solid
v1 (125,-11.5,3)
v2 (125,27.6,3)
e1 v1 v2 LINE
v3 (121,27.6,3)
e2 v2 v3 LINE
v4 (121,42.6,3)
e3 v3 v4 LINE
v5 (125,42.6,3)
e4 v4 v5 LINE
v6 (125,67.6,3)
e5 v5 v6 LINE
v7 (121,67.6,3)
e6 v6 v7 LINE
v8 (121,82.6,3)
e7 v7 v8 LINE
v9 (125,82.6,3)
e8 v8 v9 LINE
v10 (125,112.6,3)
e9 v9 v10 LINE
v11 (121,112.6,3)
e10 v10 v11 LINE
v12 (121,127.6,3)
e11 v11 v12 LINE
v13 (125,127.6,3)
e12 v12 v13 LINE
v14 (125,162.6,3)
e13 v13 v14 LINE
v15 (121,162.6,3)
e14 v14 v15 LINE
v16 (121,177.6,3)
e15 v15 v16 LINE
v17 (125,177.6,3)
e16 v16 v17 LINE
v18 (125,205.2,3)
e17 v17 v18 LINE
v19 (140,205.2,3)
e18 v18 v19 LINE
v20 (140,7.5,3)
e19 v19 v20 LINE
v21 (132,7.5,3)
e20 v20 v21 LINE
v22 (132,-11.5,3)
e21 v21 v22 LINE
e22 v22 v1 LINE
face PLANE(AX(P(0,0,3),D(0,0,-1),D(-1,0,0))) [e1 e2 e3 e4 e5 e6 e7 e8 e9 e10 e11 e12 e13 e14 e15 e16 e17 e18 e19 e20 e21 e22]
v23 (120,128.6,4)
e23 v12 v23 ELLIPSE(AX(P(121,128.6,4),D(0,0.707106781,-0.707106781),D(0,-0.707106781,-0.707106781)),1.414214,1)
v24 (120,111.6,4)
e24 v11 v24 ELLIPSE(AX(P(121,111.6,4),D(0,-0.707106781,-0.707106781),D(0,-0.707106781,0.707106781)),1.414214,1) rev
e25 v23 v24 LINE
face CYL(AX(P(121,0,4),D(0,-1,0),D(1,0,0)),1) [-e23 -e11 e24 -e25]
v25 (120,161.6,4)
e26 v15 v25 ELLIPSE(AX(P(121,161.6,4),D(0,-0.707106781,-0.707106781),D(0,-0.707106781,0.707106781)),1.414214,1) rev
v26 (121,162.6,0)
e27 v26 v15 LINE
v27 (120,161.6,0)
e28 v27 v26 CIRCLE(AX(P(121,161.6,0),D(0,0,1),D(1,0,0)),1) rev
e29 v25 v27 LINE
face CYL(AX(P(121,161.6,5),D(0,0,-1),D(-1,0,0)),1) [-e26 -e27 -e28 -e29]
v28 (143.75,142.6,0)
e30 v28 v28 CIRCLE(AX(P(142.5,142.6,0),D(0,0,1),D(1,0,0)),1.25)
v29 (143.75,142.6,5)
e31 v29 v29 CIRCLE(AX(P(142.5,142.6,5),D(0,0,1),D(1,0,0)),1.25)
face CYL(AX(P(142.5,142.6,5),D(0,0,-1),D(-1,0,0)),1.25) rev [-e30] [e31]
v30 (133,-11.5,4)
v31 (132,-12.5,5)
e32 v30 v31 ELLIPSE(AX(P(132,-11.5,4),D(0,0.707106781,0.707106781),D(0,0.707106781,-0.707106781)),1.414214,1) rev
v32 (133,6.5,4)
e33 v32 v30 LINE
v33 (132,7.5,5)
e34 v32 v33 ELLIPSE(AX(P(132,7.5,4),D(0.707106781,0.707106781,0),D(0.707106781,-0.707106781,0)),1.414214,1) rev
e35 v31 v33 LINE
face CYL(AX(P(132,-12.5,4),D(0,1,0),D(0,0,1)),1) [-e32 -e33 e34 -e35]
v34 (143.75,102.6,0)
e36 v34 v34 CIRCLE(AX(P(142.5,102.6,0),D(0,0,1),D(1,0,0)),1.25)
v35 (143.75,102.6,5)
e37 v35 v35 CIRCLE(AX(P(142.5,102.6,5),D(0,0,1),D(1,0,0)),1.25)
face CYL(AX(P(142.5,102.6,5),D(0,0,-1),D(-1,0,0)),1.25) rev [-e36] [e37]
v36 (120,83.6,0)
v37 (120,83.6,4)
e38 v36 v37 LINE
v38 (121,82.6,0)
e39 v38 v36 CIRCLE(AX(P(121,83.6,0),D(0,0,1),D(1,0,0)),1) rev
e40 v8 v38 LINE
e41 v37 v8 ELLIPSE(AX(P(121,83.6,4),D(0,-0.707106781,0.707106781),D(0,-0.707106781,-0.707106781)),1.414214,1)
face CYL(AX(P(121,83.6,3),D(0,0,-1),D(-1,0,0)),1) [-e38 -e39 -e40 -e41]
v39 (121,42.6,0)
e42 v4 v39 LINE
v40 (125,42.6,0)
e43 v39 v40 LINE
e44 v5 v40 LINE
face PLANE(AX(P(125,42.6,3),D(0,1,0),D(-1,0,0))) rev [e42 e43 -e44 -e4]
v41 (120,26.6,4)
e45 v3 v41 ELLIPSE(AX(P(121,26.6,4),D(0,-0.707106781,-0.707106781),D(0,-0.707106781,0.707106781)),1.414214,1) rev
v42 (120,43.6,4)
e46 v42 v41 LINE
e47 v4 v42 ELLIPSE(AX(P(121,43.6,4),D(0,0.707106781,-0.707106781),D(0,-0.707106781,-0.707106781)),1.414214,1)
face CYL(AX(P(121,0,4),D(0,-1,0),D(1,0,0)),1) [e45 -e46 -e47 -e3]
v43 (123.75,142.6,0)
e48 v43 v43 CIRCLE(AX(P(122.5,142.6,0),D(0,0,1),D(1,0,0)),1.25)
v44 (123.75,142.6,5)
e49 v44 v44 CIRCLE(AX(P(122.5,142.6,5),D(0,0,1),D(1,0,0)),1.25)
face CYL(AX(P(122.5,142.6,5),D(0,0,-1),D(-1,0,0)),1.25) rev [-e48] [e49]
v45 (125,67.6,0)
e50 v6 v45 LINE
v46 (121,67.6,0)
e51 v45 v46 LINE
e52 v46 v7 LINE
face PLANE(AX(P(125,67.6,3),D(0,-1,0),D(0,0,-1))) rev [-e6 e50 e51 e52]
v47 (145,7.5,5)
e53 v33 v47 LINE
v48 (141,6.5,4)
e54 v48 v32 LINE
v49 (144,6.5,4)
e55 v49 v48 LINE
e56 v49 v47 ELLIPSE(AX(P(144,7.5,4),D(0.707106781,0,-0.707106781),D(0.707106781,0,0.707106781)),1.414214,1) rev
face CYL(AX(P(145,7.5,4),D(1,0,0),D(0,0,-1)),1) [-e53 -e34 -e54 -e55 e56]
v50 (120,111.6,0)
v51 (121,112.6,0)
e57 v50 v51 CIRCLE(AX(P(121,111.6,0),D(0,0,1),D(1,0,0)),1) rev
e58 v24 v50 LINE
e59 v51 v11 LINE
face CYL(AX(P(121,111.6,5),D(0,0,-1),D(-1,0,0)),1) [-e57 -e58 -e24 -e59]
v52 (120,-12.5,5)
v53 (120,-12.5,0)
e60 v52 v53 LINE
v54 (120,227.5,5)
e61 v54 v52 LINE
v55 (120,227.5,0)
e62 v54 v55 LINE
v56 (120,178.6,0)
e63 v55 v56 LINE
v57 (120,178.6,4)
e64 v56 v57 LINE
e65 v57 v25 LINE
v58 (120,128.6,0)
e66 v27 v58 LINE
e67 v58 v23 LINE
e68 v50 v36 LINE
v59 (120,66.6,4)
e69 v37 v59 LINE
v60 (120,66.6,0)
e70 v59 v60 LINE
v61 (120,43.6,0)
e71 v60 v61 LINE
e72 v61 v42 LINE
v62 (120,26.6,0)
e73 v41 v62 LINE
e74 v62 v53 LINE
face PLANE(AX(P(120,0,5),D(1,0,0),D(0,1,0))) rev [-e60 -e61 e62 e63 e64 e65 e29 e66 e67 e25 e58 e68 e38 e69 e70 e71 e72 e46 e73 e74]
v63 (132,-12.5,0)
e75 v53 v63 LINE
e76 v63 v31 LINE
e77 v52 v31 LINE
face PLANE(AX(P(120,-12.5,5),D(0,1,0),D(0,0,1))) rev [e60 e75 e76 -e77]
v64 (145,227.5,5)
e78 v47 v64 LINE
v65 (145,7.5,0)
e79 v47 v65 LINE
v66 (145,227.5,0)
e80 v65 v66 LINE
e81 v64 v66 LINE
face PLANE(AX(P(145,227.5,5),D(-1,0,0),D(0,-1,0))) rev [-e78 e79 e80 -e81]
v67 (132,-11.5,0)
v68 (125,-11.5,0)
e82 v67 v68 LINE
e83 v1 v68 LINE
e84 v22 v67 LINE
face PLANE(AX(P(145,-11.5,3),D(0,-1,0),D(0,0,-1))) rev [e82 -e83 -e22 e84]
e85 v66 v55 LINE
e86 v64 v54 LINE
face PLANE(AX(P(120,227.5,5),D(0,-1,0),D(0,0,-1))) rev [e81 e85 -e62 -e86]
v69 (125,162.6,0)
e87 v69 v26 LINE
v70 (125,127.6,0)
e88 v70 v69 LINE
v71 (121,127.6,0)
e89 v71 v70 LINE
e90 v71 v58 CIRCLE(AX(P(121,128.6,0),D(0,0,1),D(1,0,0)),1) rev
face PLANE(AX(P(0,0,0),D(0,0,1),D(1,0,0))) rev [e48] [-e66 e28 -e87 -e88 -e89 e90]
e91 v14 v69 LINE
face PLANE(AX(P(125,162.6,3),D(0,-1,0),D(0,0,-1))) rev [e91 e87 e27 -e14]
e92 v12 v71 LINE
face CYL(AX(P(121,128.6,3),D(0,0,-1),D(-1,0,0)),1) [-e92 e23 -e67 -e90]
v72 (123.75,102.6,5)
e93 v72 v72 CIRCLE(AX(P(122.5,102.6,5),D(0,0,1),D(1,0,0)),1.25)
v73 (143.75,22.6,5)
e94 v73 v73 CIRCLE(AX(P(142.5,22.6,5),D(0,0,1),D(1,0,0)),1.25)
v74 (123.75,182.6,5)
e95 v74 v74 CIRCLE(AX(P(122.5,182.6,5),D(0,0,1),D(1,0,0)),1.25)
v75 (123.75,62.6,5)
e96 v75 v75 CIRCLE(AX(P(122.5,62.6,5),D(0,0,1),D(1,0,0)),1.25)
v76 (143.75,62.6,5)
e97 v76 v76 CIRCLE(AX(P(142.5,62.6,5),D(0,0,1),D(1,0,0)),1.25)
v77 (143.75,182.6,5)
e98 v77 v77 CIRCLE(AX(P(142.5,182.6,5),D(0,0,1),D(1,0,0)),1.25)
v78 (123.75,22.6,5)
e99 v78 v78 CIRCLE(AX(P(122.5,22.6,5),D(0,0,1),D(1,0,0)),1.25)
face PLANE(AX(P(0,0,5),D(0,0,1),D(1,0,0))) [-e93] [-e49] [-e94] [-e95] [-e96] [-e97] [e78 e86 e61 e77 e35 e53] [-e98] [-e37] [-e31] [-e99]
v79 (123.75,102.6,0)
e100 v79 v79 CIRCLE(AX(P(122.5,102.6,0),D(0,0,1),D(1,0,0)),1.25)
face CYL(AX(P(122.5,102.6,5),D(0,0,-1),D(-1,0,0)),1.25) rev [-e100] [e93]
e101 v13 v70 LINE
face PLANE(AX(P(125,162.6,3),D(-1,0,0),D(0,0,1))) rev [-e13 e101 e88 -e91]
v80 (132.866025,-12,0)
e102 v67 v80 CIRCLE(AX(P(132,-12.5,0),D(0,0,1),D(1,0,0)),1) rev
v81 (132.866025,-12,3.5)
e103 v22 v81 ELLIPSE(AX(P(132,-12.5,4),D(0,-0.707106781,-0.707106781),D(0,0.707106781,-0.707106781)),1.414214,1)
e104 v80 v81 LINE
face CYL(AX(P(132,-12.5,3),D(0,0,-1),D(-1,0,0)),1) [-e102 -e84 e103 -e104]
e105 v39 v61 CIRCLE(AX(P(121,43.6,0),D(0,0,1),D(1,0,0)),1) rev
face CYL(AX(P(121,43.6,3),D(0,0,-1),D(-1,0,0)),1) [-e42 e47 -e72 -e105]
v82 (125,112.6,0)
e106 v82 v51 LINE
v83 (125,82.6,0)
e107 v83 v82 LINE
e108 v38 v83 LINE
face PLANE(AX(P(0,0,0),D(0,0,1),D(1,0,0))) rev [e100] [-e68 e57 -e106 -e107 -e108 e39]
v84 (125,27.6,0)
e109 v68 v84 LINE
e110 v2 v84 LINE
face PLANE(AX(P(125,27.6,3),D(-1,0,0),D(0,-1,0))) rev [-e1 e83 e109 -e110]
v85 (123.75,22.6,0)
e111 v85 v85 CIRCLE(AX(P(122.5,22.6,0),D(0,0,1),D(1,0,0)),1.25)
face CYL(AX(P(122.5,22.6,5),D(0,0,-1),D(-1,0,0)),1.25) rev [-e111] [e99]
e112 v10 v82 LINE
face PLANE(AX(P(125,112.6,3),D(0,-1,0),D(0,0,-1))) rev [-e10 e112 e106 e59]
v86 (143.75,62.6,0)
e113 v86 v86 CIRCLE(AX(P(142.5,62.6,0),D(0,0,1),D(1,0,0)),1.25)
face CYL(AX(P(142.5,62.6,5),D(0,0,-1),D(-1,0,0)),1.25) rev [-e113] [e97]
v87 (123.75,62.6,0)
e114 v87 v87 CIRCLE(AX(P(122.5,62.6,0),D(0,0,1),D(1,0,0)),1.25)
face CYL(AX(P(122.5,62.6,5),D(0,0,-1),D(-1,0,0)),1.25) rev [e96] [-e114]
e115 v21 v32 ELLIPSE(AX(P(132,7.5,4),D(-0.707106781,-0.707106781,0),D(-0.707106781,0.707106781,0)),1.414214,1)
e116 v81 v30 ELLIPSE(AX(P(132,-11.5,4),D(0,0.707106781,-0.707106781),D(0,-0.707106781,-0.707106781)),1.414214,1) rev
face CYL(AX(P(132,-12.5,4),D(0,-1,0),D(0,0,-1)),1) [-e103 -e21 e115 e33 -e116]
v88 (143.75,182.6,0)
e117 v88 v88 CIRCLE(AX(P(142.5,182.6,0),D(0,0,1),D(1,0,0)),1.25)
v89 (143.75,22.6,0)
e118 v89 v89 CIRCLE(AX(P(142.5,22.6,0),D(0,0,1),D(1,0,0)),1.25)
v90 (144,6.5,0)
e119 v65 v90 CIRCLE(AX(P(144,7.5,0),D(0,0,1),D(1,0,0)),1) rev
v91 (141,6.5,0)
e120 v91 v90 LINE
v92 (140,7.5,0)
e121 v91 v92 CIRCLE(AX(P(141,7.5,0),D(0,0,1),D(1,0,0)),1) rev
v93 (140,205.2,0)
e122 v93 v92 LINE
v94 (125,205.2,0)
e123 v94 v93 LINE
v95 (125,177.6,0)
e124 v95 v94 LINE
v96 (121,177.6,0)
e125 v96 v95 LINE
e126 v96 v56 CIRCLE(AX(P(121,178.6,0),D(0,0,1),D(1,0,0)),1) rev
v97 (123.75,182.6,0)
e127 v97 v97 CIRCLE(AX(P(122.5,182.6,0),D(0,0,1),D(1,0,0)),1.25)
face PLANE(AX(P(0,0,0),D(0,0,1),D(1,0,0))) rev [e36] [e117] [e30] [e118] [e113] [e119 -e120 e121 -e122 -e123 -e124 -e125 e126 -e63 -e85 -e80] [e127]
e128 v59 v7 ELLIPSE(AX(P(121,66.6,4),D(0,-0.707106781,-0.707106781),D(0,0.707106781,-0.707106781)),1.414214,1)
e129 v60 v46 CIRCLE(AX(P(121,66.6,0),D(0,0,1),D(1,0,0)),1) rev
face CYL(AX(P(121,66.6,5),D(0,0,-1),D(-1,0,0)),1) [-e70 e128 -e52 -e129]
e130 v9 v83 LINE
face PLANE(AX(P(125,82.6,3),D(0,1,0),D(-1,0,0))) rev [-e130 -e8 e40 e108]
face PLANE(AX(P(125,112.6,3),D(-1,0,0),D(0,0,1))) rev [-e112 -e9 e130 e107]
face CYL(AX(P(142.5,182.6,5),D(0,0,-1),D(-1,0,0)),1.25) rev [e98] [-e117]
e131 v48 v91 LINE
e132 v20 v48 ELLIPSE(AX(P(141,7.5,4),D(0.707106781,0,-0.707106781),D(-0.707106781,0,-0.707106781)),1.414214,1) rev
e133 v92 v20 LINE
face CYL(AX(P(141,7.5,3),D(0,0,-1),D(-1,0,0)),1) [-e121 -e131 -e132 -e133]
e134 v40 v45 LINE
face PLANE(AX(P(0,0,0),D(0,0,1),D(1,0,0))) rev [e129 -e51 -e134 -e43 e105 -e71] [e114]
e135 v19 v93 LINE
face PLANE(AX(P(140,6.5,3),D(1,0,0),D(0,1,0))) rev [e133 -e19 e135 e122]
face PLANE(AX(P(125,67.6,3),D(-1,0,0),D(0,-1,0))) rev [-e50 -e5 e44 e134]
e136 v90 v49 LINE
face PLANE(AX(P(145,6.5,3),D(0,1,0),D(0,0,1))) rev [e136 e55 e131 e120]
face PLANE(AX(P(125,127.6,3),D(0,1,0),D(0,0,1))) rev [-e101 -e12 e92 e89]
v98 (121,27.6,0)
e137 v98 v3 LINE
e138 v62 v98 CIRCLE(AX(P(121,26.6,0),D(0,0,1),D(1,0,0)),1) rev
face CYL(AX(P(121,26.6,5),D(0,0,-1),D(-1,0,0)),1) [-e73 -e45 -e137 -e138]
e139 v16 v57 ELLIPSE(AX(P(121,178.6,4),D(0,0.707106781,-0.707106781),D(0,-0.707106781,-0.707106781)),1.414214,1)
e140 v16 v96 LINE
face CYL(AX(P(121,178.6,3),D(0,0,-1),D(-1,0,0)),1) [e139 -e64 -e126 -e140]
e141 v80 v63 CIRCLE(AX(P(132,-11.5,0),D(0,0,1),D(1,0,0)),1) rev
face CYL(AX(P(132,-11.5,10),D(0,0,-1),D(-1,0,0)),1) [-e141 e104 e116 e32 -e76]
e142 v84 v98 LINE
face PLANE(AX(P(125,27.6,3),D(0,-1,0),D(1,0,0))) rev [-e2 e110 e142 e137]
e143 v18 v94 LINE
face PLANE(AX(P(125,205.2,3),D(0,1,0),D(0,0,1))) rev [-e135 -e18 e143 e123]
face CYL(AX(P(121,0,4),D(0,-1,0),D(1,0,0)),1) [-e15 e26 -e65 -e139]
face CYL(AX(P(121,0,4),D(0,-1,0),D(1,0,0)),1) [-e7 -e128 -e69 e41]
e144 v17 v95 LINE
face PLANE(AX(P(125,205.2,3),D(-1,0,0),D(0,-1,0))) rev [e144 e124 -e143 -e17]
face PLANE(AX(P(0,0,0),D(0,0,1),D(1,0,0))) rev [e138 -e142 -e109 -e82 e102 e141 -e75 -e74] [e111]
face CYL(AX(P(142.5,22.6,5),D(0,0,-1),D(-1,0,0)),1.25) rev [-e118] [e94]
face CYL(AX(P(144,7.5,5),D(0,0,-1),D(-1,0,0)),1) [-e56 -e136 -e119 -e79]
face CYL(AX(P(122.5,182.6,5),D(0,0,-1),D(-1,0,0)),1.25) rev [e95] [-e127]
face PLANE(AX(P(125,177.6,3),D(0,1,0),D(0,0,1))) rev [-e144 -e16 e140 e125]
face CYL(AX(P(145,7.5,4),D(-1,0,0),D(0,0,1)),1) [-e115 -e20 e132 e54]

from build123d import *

# Parameters (mm, degrees)
SKETCH2_R           = 1.25
BOSS_EXTRUDE1_DEPTH = 5
CUT_EXTRUDE1_DEPTH  = 3
SKETCH4_W           = 12
SKETCH4_H           = 19
CUT_EXTRUDE2_DEPTH  = 10
FILLET1_R           = 1


with BuildPart() as part:
    # Sketch2 → Boss-Extrude1 (new body)
    with BuildSketch(Plane.XY):
        Polygon((120, 0), (120, -12.5), (145, -12.5), (145, 0), (145, 227.5), (120, 227.5), align=None)
        with Locations((142.5, 22.6)):
            Circle(SKETCH2_R, mode=Mode.SUBTRACT)
        with Locations((142.5, 62.6)):
            Circle(SKETCH2_R, mode=Mode.SUBTRACT)
        with Locations((142.5, 102.6)):
            Circle(SKETCH2_R, mode=Mode.SUBTRACT)
        with Locations((142.5, 142.6)):
            Circle(SKETCH2_R, mode=Mode.SUBTRACT)
        with Locations((142.5, 182.6)):
            Circle(SKETCH2_R, mode=Mode.SUBTRACT)
        with Locations((122.5, 182.6)):
            Circle(SKETCH2_R, mode=Mode.SUBTRACT)
        with Locations((122.5, 142.6)):
            Circle(SKETCH2_R, mode=Mode.SUBTRACT)
        with Locations((122.5, 62.6)):
            Circle(SKETCH2_R, mode=Mode.SUBTRACT)
        with Locations((122.5, 102.6)):
            Circle(SKETCH2_R, mode=Mode.SUBTRACT)
        with Locations((122.5, 22.6)):
            Circle(SKETCH2_R, mode=Mode.SUBTRACT)
    extrude(amount=BOSS_EXTRUDE1_DEPTH)

    # Sketch3 → Cut-Extrude1 (cut)
    with BuildSketch(Plane(origin=(0, 0, 0), x_dir=(-1, 0, 0), z_dir=(0, 0, -1))):
        Polygon((-125, 177.6), (-120, 177.6), (-120, 162.6), (-125, 162.6), (-125, 127.6), (-120, 127.6), (-120, 112.6), (-125, 112.6), (-125, 82.6), (-120, 82.6), (-120, 67.6), (-125, 67.6), (-125, 42.6), (-120, 42.6), (-120, 27.6), (-125, 27.6), (-125, 0), (-125, -11.5), (-145, -11.5), (-145, 6.5), (-140, 6.5), (-140, 205.2), (-125, 205.2), align=None)
    extrude(amount=-CUT_EXTRUDE1_DEPTH, mode=Mode.SUBTRACT)

    # Sketch4 → Cut-Extrude2 (cut)
    with BuildSketch(Plane(origin=(0, 0, 0), x_dir=(-1, 0, 0), z_dir=(0, 0, -1))):
        with Locations((-139, -3)):
            Rectangle(SKETCH4_W, SKETCH4_H)
    extrude(amount=-CUT_EXTRUDE2_DEPTH, mode=Mode.SUBTRACT)

    # Fillet1
    # the kernel refuses this fillet: 1 mm, written as the material it takes off along each edge
    with BuildSketch(Plane(origin=(133, 6.5, 3), x_dir=(0, 0, 1), z_dir=(0, -1, 0))) as fillet1_piece_1:
        with BuildLine():
            CenterArc((FILLET1_R, FILLET1_R), FILLET1_R, 180, 90)
            Line((0, FILLET1_R), (-FILLET1_R * 0.02, FILLET1_R))
            Line((-FILLET1_R * 0.02, FILLET1_R), (-FILLET1_R * 0.02, -FILLET1_R * 0.02))
            Line((-FILLET1_R * 0.02, -FILLET1_R * 0.02), (FILLET1_R, -FILLET1_R * 0.02))
            Line((FILLET1_R, -FILLET1_R * 0.02), (FILLET1_R, 0))
        make_face()
    extrude(amount=18, mode=Mode.SUBTRACT)
    with BuildSketch(Plane(origin=(133, 6.5, 5), x_dir=(0, 0, -1), z_dir=(0, -1, 0))) as fillet1_piece_2:
        with BuildLine():
            CenterArc((FILLET1_R, -FILLET1_R), FILLET1_R, 90, 90)
            Line((0, -FILLET1_R), (-FILLET1_R * 0.02, -FILLET1_R))
            Line((-FILLET1_R * 0.02, -FILLET1_R), (-FILLET1_R * 0.02, FILLET1_R * 0.02))
            Line((-FILLET1_R * 0.02, FILLET1_R * 0.02), (FILLET1_R, FILLET1_R * 0.02))
            Line((FILLET1_R, FILLET1_R * 0.02), (FILLET1_R, 0))
        make_face()
    extrude(amount=19, mode=Mode.SUBTRACT)
    with BuildSketch(Plane(origin=(133, -12.5, 0), x_dir=(0, 1, 0), z_dir=(0, 0, 1)), Plane(origin=(145, 6.5, 5), x_dir=(-1, 0, 0), z_dir=(0, 0, -1))) as fillet1_piece_3:
        with BuildLine():
            CenterArc((FILLET1_R, FILLET1_R), FILLET1_R, 180, 90)
            Line((0, FILLET1_R), (-FILLET1_R * 0.02, FILLET1_R))
            Line((-FILLET1_R * 0.02, FILLET1_R), (-FILLET1_R * 0.02, -FILLET1_R * 0.02))
            Line((-FILLET1_R * 0.02, -FILLET1_R * 0.02), (FILLET1_R, -FILLET1_R * 0.02))
            Line((FILLET1_R, -FILLET1_R * 0.02), (FILLET1_R, 0))
        make_face()
    extrude(amount=5, mode=Mode.SUBTRACT)
    with BuildSketch(Plane(origin=(133, -11.5, 0), x_dir=(0, -1, 0), z_dir=(0, 0, 1)), Plane(origin=(120, 42.6, 0), x_dir=(0, 1, 0), z_dir=(0, 0, 1)), Plane(origin=(120, 82.6, 0), x_dir=(0, 1, 0), z_dir=(0, 0, 1)), Plane(origin=(120, 127.6, 0), x_dir=(0, 1, 0), z_dir=(0, 0, 1)), Plane(origin=(120, 177.6, 0), x_dir=(0, 1, 0), z_dir=(0, 0, 1))) as fillet1_piece_4:
        with BuildLine():
            CenterArc((FILLET1_R, -FILLET1_R), FILLET1_R, 90, 90)
            Line((0, -FILLET1_R), (-FILLET1_R * 0.02, -FILLET1_R))
            Line((-FILLET1_R * 0.02, -FILLET1_R), (-FILLET1_R * 0.02, FILLET1_R * 0.02))
            Line((-FILLET1_R * 0.02, FILLET1_R * 0.02), (FILLET1_R, FILLET1_R * 0.02))
            Line((FILLET1_R, FILLET1_R * 0.02), (FILLET1_R, 0))
        make_face()
    extrude(amount=3, mode=Mode.SUBTRACT)
    with BuildSketch(Plane(origin=(140, 6.5, 0), x_dir=(1, 0, 0), z_dir=(0, 0, 1)), Plane(origin=(120, 27.6, 0), x_dir=(0, -1, 0), z_dir=(0, 0, 1)), Plane(origin=(120, 67.6, 0), x_dir=(0, -1, 0), z_dir=(0, 0, 1)), Plane(origin=(120, 112.6, 0), x_dir=(0, -1, 0), z_dir=(0, 0, 1)), Plane(origin=(120, 162.6, 0), x_dir=(0, -1, 0), z_dir=(0, 0, 1))) as fillet1_piece_5:
        with BuildLine():
            CenterArc((FILLET1_R, FILLET1_R), FILLET1_R, 180, 90)
            Line((0, FILLET1_R), (-FILLET1_R * 0.02, FILLET1_R))
            Line((-FILLET1_R * 0.02, FILLET1_R), (-FILLET1_R * 0.02, -FILLET1_R * 0.02))
            Line((-FILLET1_R * 0.02, -FILLET1_R * 0.02), (FILLET1_R, -FILLET1_R * 0.02))
            Line((FILLET1_R, -FILLET1_R * 0.02), (FILLET1_R, 0))
        make_face()
    extrude(amount=3, mode=Mode.SUBTRACT)
    with BuildSketch(Plane(origin=(140, 6.5, 3), x_dir=(0, 0, 1), z_dir=(-1, 0, 0))) as fillet1_piece_6:
        with BuildLine():
            CenterArc((FILLET1_R, FILLET1_R), FILLET1_R, 180, 90)
            Line((0, FILLET1_R), (-FILLET1_R * 0.02, FILLET1_R))
            Line((-FILLET1_R * 0.02, FILLET1_R), (-FILLET1_R * 0.02, -FILLET1_R * 0.02))
            Line((-FILLET1_R * 0.02, -FILLET1_R * 0.02), (FILLET1_R, -FILLET1_R * 0.02))
            Line((FILLET1_R, -FILLET1_R * 0.02), (FILLET1_R, 0))
        make_face()
    extrude(amount=7, mode=Mode.SUBTRACT)
    with BuildSketch(Plane(origin=(145, 6.5, 5), x_dir=(0, 0, -1), z_dir=(-1, 0, 0))) as fillet1_piece_7:
        with BuildLine():
            CenterArc((FILLET1_R, -FILLET1_R), FILLET1_R, 90, 90)
            Line((0, -FILLET1_R), (-FILLET1_R * 0.02, -FILLET1_R))
            Line((-FILLET1_R * 0.02, -FILLET1_R), (-FILLET1_R * 0.02, FILLET1_R * 0.02))
            Line((-FILLET1_R * 0.02, FILLET1_R * 0.02), (FILLET1_R, FILLET1_R * 0.02))
            Line((FILLET1_R, FILLET1_R * 0.02), (FILLET1_R, 0))
        make_face()
    extrude(amount=12, mode=Mode.SUBTRACT)
    with BuildSketch(Plane(origin=(120, 42.6, 3), x_dir=(0, 0, 1), z_dir=(0, -1, 0)), Plane(origin=(120, 82.6, 3), x_dir=(0, 0, 1), z_dir=(0, -1, 0)), Plane(origin=(120, 127.6, 3), x_dir=(0, 0, 1), z_dir=(0, -1, 0)), Plane(origin=(120, 177.6, 3), x_dir=(0, 0, 1), z_dir=(0, -1, 0))) as fillet1_piece_8:
        with BuildLine():
            CenterArc((FILLET1_R, -FILLET1_R), FILLET1_R, 90, 90)
            Line((0, -FILLET1_R), (-FILLET1_R * 0.02, -FILLET1_R))
            Line((-FILLET1_R * 0.02, -FILLET1_R), (-FILLET1_R * 0.02, FILLET1_R * 0.02))
            Line((-FILLET1_R * 0.02, FILLET1_R * 0.02), (FILLET1_R, FILLET1_R * 0.02))
            Line((FILLET1_R, FILLET1_R * 0.02), (FILLET1_R, 0))
        make_face()
    extrude(amount=15, mode=Mode.SUBTRACT)
    with BuildSketch(Plane(origin=(133, 9, 3), x_dir=(0, 0, 1), z_dir=(0, -1, 0))) as fillet1_piece_9a_section:
        with BuildLine():
            CenterArc((FILLET1_R, FILLET1_R), FILLET1_R, 180, 90)
            Line((0, FILLET1_R), (-FILLET1_R * 0.02, FILLET1_R))
            Line((-FILLET1_R * 0.02, FILLET1_R), (-FILLET1_R * 0.02, -FILLET1_R * 0.02))
            Line((-FILLET1_R * 0.02, -FILLET1_R * 0.02), (FILLET1_R, -FILLET1_R * 0.02))
            Line((FILLET1_R, -FILLET1_R * 0.02), (FILLET1_R, 0))
        make_face()
    fillet1_piece_9a = extrude(amount=20.5, mode=Mode.PRIVATE)
    fillet1_piece_9a = split(fillet1_piece_9a, bisect_by=Plane(origin=(132.773604886, 6.5, 3.226395114), z_dir=(0, 1, 0)), keep=Keep.TOP, mode=Mode.PRIVATE)
    with BuildSketch(Plane(origin=(140, 6.5, 3), x_dir=(0, 0, 1), z_dir=(-1, 0, 0))) as fillet1_piece_9b_section:
        with BuildLine():
            CenterArc((FILLET1_R, FILLET1_R), FILLET1_R, 180, 90)
            Line((0, FILLET1_R), (-FILLET1_R * 0.02, FILLET1_R))
            Line((-FILLET1_R * 0.02, FILLET1_R), (-FILLET1_R * 0.02, -FILLET1_R * 0.02))
            Line((-FILLET1_R * 0.02, -FILLET1_R * 0.02), (FILLET1_R, -FILLET1_R * 0.02))
            Line((FILLET1_R, -FILLET1_R * 0.02), (FILLET1_R, 0))
        make_face()
    fillet1_piece_9b = extrude(amount=9.5, mode=Mode.PRIVATE)
    fillet1_piece_9b = split(fillet1_piece_9b, bisect_by=Plane(origin=(133, 6.726395114, 3.226395114), z_dir=(-1, 0, 0)), keep=Keep.TOP, mode=Mode.PRIVATE)
    fillet1_piece_9 = fillet1_piece_9a & fillet1_piece_9b
    add(fillet1_piece_9, mode=Mode.SUBTRACT)
    with BuildSketch(Plane(origin=(133, -11.5, 0), x_dir=(0, -1, 0), z_dir=(0, 0, 1))) as fillet1_piece_10a_section:
        with BuildLine():
            CenterArc((FILLET1_R, -FILLET1_R), FILLET1_R, 90, 90)
            Line((0, -FILLET1_R), (-FILLET1_R * 0.02, -FILLET1_R))
            Line((-FILLET1_R * 0.02, -FILLET1_R), (-FILLET1_R * 0.02, FILLET1_R * 0.02))
            Line((-FILLET1_R * 0.02, FILLET1_R * 0.02), (FILLET1_R, FILLET1_R * 0.02))
            Line((FILLET1_R, FILLET1_R * 0.02), (FILLET1_R, 0))
        make_face()
    fillet1_piece_10a = extrude(amount=5.5, mode=Mode.PRIVATE)
    fillet1_piece_10a = split(fillet1_piece_10a, bisect_by=Plane(origin=(132.773604886, -11.726395114, 3), z_dir=(0, 0, 1)), keep=Keep.TOP, mode=Mode.PRIVATE)
    with BuildSketch(Plane(origin=(133, 6.5, 3), x_dir=(0, 0, 1), z_dir=(0, -1, 0))) as fillet1_piece_10b_section:
        with BuildLine():
            CenterArc((FILLET1_R, FILLET1_R), FILLET1_R, 180, 90)
            Line((0, FILLET1_R), (-FILLET1_R * 0.02, FILLET1_R))
            Line((-FILLET1_R * 0.02, FILLET1_R), (-FILLET1_R * 0.02, -FILLET1_R * 0.02))
            Line((-FILLET1_R * 0.02, -FILLET1_R * 0.02), (FILLET1_R, -FILLET1_R * 0.02))
            Line((FILLET1_R, -FILLET1_R * 0.02), (FILLET1_R, 0))
        make_face()
    fillet1_piece_10b = extrude(amount=20.5, mode=Mode.PRIVATE)
    fillet1_piece_10b = split(fillet1_piece_10b, bisect_by=Plane(origin=(132.773604886, -11.5, 3.226395114), z_dir=(0, -1, 0)), keep=Keep.TOP, mode=Mode.PRIVATE)
    fillet1_piece_10 = fillet1_piece_10a & fillet1_piece_10b
    add(fillet1_piece_10, mode=Mode.SUBTRACT)
    with BuildSketch(Plane(origin=(133, 9, 5), x_dir=(0, 0, -1), z_dir=(0, -1, 0))) as fillet1_piece_11a_section:
        with BuildLine():
            CenterArc((FILLET1_R, -FILLET1_R), FILLET1_R, 90, 90)
            Line((0, -FILLET1_R), (-FILLET1_R * 0.02, -FILLET1_R))
            Line((-FILLET1_R * 0.02, -FILLET1_R), (-FILLET1_R * 0.02, FILLET1_R * 0.02))
            Line((-FILLET1_R * 0.02, FILLET1_R * 0.02), (FILLET1_R, FILLET1_R * 0.02))
            Line((FILLET1_R, FILLET1_R * 0.02), (FILLET1_R, 0))
        make_face()
    fillet1_piece_11a = extrude(amount=21.5, mode=Mode.PRIVATE)
    fillet1_piece_11a = split(fillet1_piece_11a, bisect_by=Plane(origin=(132.773604886, 6.5, 4.773604886), z_dir=(0, 1, 0)), keep=Keep.TOP, mode=Mode.PRIVATE)
    with BuildSketch(Plane(origin=(145, 6.5, 5), x_dir=(0, 0, -1), z_dir=(-1, 0, 0))) as fillet1_piece_11b_section:
        with BuildLine():
            CenterArc((FILLET1_R, -FILLET1_R), FILLET1_R, 90, 90)
            Line((0, -FILLET1_R), (-FILLET1_R * 0.02, -FILLET1_R))
            Line((-FILLET1_R * 0.02, -FILLET1_R), (-FILLET1_R * 0.02, FILLET1_R * 0.02))
            Line((-FILLET1_R * 0.02, FILLET1_R * 0.02), (FILLET1_R, FILLET1_R * 0.02))
            Line((FILLET1_R, FILLET1_R * 0.02), (FILLET1_R, 0))
        make_face()
    fillet1_piece_11b = extrude(amount=14.5, mode=Mode.PRIVATE)
    fillet1_piece_11b = split(fillet1_piece_11b, bisect_by=Plane(origin=(133, 6.726395114, 4.773604886), z_dir=(-1, 0, 0)), keep=Keep.TOP, mode=Mode.PRIVATE)
    fillet1_piece_11 = fillet1_piece_11a & fillet1_piece_11b
    add(fillet1_piece_11, mode=Mode.SUBTRACT)
    with BuildSketch(Plane(origin=(133, 6.5, 5), x_dir=(0, 0, -1), z_dir=(0, -1, 0))) as fillet1_piece_12a_section:
        with BuildLine():
            CenterArc((FILLET1_R, -FILLET1_R), FILLET1_R, 90, 90)
            Line((0, -FILLET1_R), (-FILLET1_R * 0.02, -FILLET1_R))
            Line((-FILLET1_R * 0.02, -FILLET1_R), (-FILLET1_R * 0.02, FILLET1_R * 0.02))
            Line((-FILLET1_R * 0.02, FILLET1_R * 0.02), (FILLET1_R, FILLET1_R * 0.02))
            Line((FILLET1_R, FILLET1_R * 0.02), (FILLET1_R, 0))
        make_face()
    fillet1_piece_12a = extrude(amount=21.5, mode=Mode.PRIVATE)
    fillet1_piece_12a = split(fillet1_piece_12a, bisect_by=Plane(origin=(132.773604886, -12.5, 4.773604886), z_dir=(0, -1, 0)), keep=Keep.TOP, mode=Mode.PRIVATE)
    with BuildSketch(Plane(origin=(133, -12.5, 0), x_dir=(0, 1, 0), z_dir=(0, 0, 1))) as fillet1_piece_12b_section:
        with BuildLine():
            CenterArc((FILLET1_R, FILLET1_R), FILLET1_R, 180, 90)
            Line((0, FILLET1_R), (-FILLET1_R * 0.02, FILLET1_R))
            Line((-FILLET1_R * 0.02, FILLET1_R), (-FILLET1_R * 0.02, -FILLET1_R * 0.02))
            Line((-FILLET1_R * 0.02, -FILLET1_R * 0.02), (FILLET1_R, -FILLET1_R * 0.02))
            Line((FILLET1_R, -FILLET1_R * 0.02), (FILLET1_R, 0))
        make_face()
    fillet1_piece_12b = extrude(amount=7.5, mode=Mode.PRIVATE)
    fillet1_piece_12b = split(fillet1_piece_12b, bisect_by=Plane(origin=(132.773604886, -12.273604886, 5), z_dir=(0, 0, 1)), keep=Keep.TOP, mode=Mode.PRIVATE)
    fillet1_piece_12 = fillet1_piece_12a & fillet1_piece_12b
    add(fillet1_piece_12, mode=Mode.SUBTRACT)
    with BuildSketch(Plane(origin=(147.5, 6.5, 5), x_dir=(0, 0, -1), z_dir=(-1, 0, 0))) as fillet1_piece_13a_section:
        with BuildLine():
            CenterArc((FILLET1_R, -FILLET1_R), FILLET1_R, 90, 90)
            Line((0, -FILLET1_R), (-FILLET1_R * 0.02, -FILLET1_R))
            Line((-FILLET1_R * 0.02, -FILLET1_R), (-FILLET1_R * 0.02, FILLET1_R * 0.02))
            Line((-FILLET1_R * 0.02, FILLET1_R * 0.02), (FILLET1_R, FILLET1_R * 0.02))
            Line((FILLET1_R, FILLET1_R * 0.02), (FILLET1_R, 0))
        make_face()
    fillet1_piece_13a = extrude(amount=14.5, mode=Mode.PRIVATE)
    fillet1_piece_13a = split(fillet1_piece_13a, bisect_by=Plane(origin=(145, 6.726395114, 4.773604886), z_dir=(1, 0, 0)), keep=Keep.TOP, mode=Mode.PRIVATE)
    with BuildSketch(Plane(origin=(145, 6.5, 7.5), x_dir=(-1, 0, 0), z_dir=(0, 0, -1))) as fillet1_piece_13b_section:
        with BuildLine():
            CenterArc((FILLET1_R, FILLET1_R), FILLET1_R, 180, 90)
            Line((0, FILLET1_R), (-FILLET1_R * 0.02, FILLET1_R))
            Line((-FILLET1_R * 0.02, FILLET1_R), (-FILLET1_R * 0.02, -FILLET1_R * 0.02))
            Line((-FILLET1_R * 0.02, -FILLET1_R * 0.02), (FILLET1_R, -FILLET1_R * 0.02))
            Line((FILLET1_R, -FILLET1_R * 0.02), (FILLET1_R, 0))
        make_face()
    fillet1_piece_13b = extrude(amount=7.5, mode=Mode.PRIVATE)
    fillet1_piece_13b = split(fillet1_piece_13b, bisect_by=Plane(origin=(144.773604886, 6.726395114, 5), z_dir=(0, 0, 1)), keep=Keep.TOP, mode=Mode.PRIVATE)
    fillet1_piece_13 = fillet1_piece_13a & fillet1_piece_13b
    add(fillet1_piece_13, mode=Mode.SUBTRACT)
    with BuildSketch(Plane(origin=(142.5, 6.5, 3), x_dir=(0, 0, 1), z_dir=(-1, 0, 0))) as fillet1_piece_14a_section:
        with BuildLine():
            CenterArc((FILLET1_R, FILLET1_R), FILLET1_R, 180, 90)
            Line((0, FILLET1_R), (-FILLET1_R * 0.02, FILLET1_R))
            Line((-FILLET1_R * 0.02, FILLET1_R), (-FILLET1_R * 0.02, -FILLET1_R * 0.02))
            Line((-FILLET1_R * 0.02, -FILLET1_R * 0.02), (FILLET1_R, -FILLET1_R * 0.02))
            Line((FILLET1_R, -FILLET1_R * 0.02), (FILLET1_R, 0))
        make_face()
    fillet1_piece_14a = extrude(amount=9.5, mode=Mode.PRIVATE)
    fillet1_piece_14a = split(fillet1_piece_14a, bisect_by=Plane(origin=(140, 6.726395114, 3.226395114), z_dir=(1, 0, 0)), keep=Keep.TOP, mode=Mode.PRIVATE)
    with BuildSketch(Plane(origin=(140, 6.5, 0), x_dir=(1, 0, 0), z_dir=(0, 0, 1))) as fillet1_piece_14b_section:
        with BuildLine():
            CenterArc((FILLET1_R, FILLET1_R), FILLET1_R, 180, 90)
            Line((0, FILLET1_R), (-FILLET1_R * 0.02, FILLET1_R))
            Line((-FILLET1_R * 0.02, FILLET1_R), (-FILLET1_R * 0.02, -FILLET1_R * 0.02))
            Line((-FILLET1_R * 0.02, -FILLET1_R * 0.02), (FILLET1_R, -FILLET1_R * 0.02))
            Line((FILLET1_R, -FILLET1_R * 0.02), (FILLET1_R, 0))
        make_face()
    fillet1_piece_14b = extrude(amount=5.5, mode=Mode.PRIVATE)
    fillet1_piece_14b = split(fillet1_piece_14b, bisect_by=Plane(origin=(140.226395114, 6.726395114, 3), z_dir=(0, 0, 1)), keep=Keep.TOP, mode=Mode.PRIVATE)
    fillet1_piece_14 = fillet1_piece_14a & fillet1_piece_14b
    add(fillet1_piece_14, mode=Mode.SUBTRACT)
    with BuildSketch(Plane(origin=(120, 42.6, 0), x_dir=(0, 1, 0), z_dir=(0, 0, 1))) as fillet1_piece_15a_section:
        with BuildLine():
            CenterArc((FILLET1_R, -FILLET1_R), FILLET1_R, 90, 90)
            Line((0, -FILLET1_R), (-FILLET1_R * 0.02, -FILLET1_R))
            Line((-FILLET1_R * 0.02, -FILLET1_R), (-FILLET1_R * 0.02, FILLET1_R * 0.02))
            Line((-FILLET1_R * 0.02, FILLET1_R * 0.02), (FILLET1_R, FILLET1_R * 0.02))
            Line((FILLET1_R, FILLET1_R * 0.02), (FILLET1_R, 0))
        make_face()
    fillet1_piece_15a = extrude(amount=5.5, mode=Mode.PRIVATE)
    fillet1_piece_15a = split(fillet1_piece_15a, bisect_by=Plane(origin=(120.226395114, 42.826395114, 3), z_dir=(0, 0, 1)), keep=Keep.TOP, mode=Mode.PRIVATE)
    with BuildSketch(Plane(origin=(120, 45.1, 3), x_dir=(0, 0, 1), z_dir=(0, -1, 0))) as fillet1_piece_15b_section:
        with BuildLine():
            CenterArc((FILLET1_R, -FILLET1_R), FILLET1_R, 90, 90)
            Line((0, -FILLET1_R), (-FILLET1_R * 0.02, -FILLET1_R))
            Line((-FILLET1_R * 0.02, -FILLET1_R), (-FILLET1_R * 0.02, FILLET1_R * 0.02))
            Line((-FILLET1_R * 0.02, FILLET1_R * 0.02), (FILLET1_R, FILLET1_R * 0.02))
            Line((FILLET1_R, FILLET1_R * 0.02), (FILLET1_R, 0))
        make_face()
    fillet1_piece_15b = extrude(amount=17.5, mode=Mode.PRIVATE)
    fillet1_piece_15b = split(fillet1_piece_15b, bisect_by=Plane(origin=(120.226395114, 42.6, 3.226395114), z_dir=(0, 1, 0)), keep=Keep.TOP, mode=Mode.PRIVATE)
    fillet1_piece_15 = fillet1_piece_15a & fillet1_piece_15b
    add(fillet1_piece_15, mode=Mode.SUBTRACT)
    with BuildSketch(Plane(origin=(120, 42.6, 3), x_dir=(0, 0, 1), z_dir=(0, -1, 0))) as fillet1_piece_16a_section:
        with BuildLine():
            CenterArc((FILLET1_R, -FILLET1_R), FILLET1_R, 90, 90)
            Line((0, -FILLET1_R), (-FILLET1_R * 0.02, -FILLET1_R))
            Line((-FILLET1_R * 0.02, -FILLET1_R), (-FILLET1_R * 0.02, FILLET1_R * 0.02))
            Line((-FILLET1_R * 0.02, FILLET1_R * 0.02), (FILLET1_R, FILLET1_R * 0.02))
            Line((FILLET1_R, FILLET1_R * 0.02), (FILLET1_R, 0))
        make_face()
    fillet1_piece_16a = extrude(amount=17.5, mode=Mode.PRIVATE)
    fillet1_piece_16a = split(fillet1_piece_16a, bisect_by=Plane(origin=(120.226395114, 27.6, 3.226395114), z_dir=(0, -1, 0)), keep=Keep.TOP, mode=Mode.PRIVATE)
    with BuildSketch(Plane(origin=(120, 27.6, 0), x_dir=(0, -1, 0), z_dir=(0, 0, 1))) as fillet1_piece_16b_section:
        with BuildLine():
            CenterArc((FILLET1_R, FILLET1_R), FILLET1_R, 180, 90)
            Line((0, FILLET1_R), (-FILLET1_R * 0.02, FILLET1_R))
            Line((-FILLET1_R * 0.02, FILLET1_R), (-FILLET1_R * 0.02, -FILLET1_R * 0.02))
            Line((-FILLET1_R * 0.02, -FILLET1_R * 0.02), (FILLET1_R, -FILLET1_R * 0.02))
            Line((FILLET1_R, -FILLET1_R * 0.02), (FILLET1_R, 0))
        make_face()
    fillet1_piece_16b = extrude(amount=5.5, mode=Mode.PRIVATE)
    fillet1_piece_16b = split(fillet1_piece_16b, bisect_by=Plane(origin=(120.226395114, 27.373604886, 3), z_dir=(0, 0, 1)), keep=Keep.TOP, mode=Mode.PRIVATE)
    fillet1_piece_16 = fillet1_piece_16a & fillet1_piece_16b
    add(fillet1_piece_16, mode=Mode.SUBTRACT)
    with BuildSketch(Plane(origin=(120, 82.6, 3), x_dir=(0, 0, 1), z_dir=(0, -1, 0))) as fillet1_piece_17a_section:
        with BuildLine():
            CenterArc((FILLET1_R, -FILLET1_R), FILLET1_R, 90, 90)
            Line((0, -FILLET1_R), (-FILLET1_R * 0.0200000000001, -FILLET1_R))
            Line((-FILLET1_R * 0.0200000000001, -FILLET1_R), (-FILLET1_R * 0.02, FILLET1_R * 0.02))
            Line((-FILLET1_R * 0.02, FILLET1_R * 0.02), (FILLET1_R, FILLET1_R * 0.02))
            Line((FILLET1_R, FILLET1_R * 0.02), (FILLET1_R, 0))
        make_face()
    fillet1_piece_17a = extrude(amount=17.5, mode=Mode.PRIVATE)
    fillet1_piece_17a = split(fillet1_piece_17a, bisect_by=Plane(origin=(120.226395114, 67.6, 3.226395114), z_dir=(0, -1, 0)), keep=Keep.TOP, mode=Mode.PRIVATE)
    with BuildSketch(Plane(origin=(120, 67.6, 0), x_dir=(0, -1, 0), z_dir=(0, 0, 1))) as fillet1_piece_17b_section:
        with BuildLine():
            CenterArc((FILLET1_R, FILLET1_R), FILLET1_R, 180, 90)
            Line((0, FILLET1_R), (-FILLET1_R * 0.0200000000001, FILLET1_R))
            Line((-FILLET1_R * 0.0200000000001, FILLET1_R), (-FILLET1_R * 0.02, -FILLET1_R * 0.02))
            Line((-FILLET1_R * 0.02, -FILLET1_R * 0.02), (FILLET1_R, -FILLET1_R * 0.02))
            Line((FILLET1_R, -FILLET1_R * 0.02), (FILLET1_R, 0))
        make_face()
    fillet1_piece_17b = extrude(amount=5.5, mode=Mode.PRIVATE)
    fillet1_piece_17b = split(fillet1_piece_17b, bisect_by=Plane(origin=(120.226395114, 67.373604886, 3), z_dir=(0, 0, 1)), keep=Keep.TOP, mode=Mode.PRIVATE)
    fillet1_piece_17 = fillet1_piece_17a & fillet1_piece_17b
    add(fillet1_piece_17, mode=Mode.SUBTRACT)
    with BuildSketch(Plane(origin=(120, 82.6, 0), x_dir=(0, 1, 0), z_dir=(0, 0, 1))) as fillet1_piece_18a_section:
        with BuildLine():
            CenterArc((FILLET1_R, -FILLET1_R), FILLET1_R, 90, 90)
            Line((0, -FILLET1_R), (-FILLET1_R * 0.0200000000001, -FILLET1_R))
            Line((-FILLET1_R * 0.0200000000001, -FILLET1_R), (-FILLET1_R * 0.02, FILLET1_R * 0.02))
            Line((-FILLET1_R * 0.02, FILLET1_R * 0.02), (FILLET1_R, FILLET1_R * 0.02))
            Line((FILLET1_R, FILLET1_R * 0.02), (FILLET1_R, 0))
        make_face()
    fillet1_piece_18a = extrude(amount=5.5, mode=Mode.PRIVATE)
    fillet1_piece_18a = split(fillet1_piece_18a, bisect_by=Plane(origin=(120.226395114, 82.826395114, 3), z_dir=(0, 0, 1)), keep=Keep.TOP, mode=Mode.PRIVATE)
    with BuildSketch(Plane(origin=(120, 85.1, 3), x_dir=(0, 0, 1), z_dir=(0, -1, 0))) as fillet1_piece_18b_section:
        with BuildLine():
            CenterArc((FILLET1_R, -FILLET1_R), FILLET1_R, 90, 90)
            Line((0, -FILLET1_R), (-FILLET1_R * 0.02, -FILLET1_R))
            Line((-FILLET1_R * 0.02, -FILLET1_R), (-FILLET1_R * 0.02, FILLET1_R * 0.02))
            Line((-FILLET1_R * 0.02, FILLET1_R * 0.02), (FILLET1_R, FILLET1_R * 0.02))
            Line((FILLET1_R, FILLET1_R * 0.02), (FILLET1_R, 0))
        make_face()
    fillet1_piece_18b = extrude(amount=17.5, mode=Mode.PRIVATE)
    fillet1_piece_18b = split(fillet1_piece_18b, bisect_by=Plane(origin=(120.226395114, 82.6, 3.226395114), z_dir=(0, 1, 0)), keep=Keep.TOP, mode=Mode.PRIVATE)
    fillet1_piece_18 = fillet1_piece_18a & fillet1_piece_18b
    add(fillet1_piece_18, mode=Mode.SUBTRACT)
    with BuildSketch(Plane(origin=(120, 127.6, 0), x_dir=(0, 1, 0), z_dir=(0, 0, 1))) as fillet1_piece_19a_section:
        with BuildLine():
            CenterArc((FILLET1_R, -FILLET1_R), FILLET1_R, 90, 90)
            Line((0, -FILLET1_R), (-FILLET1_R * 0.0200000000001, -FILLET1_R))
            Line((-FILLET1_R * 0.0200000000001, -FILLET1_R), (-FILLET1_R * 0.02, FILLET1_R * 0.02))
            Line((-FILLET1_R * 0.02, FILLET1_R * 0.02), (FILLET1_R, FILLET1_R * 0.02))
            Line((FILLET1_R, FILLET1_R * 0.02), (FILLET1_R, 0))
        make_face()
    fillet1_piece_19a = extrude(amount=5.5, mode=Mode.PRIVATE)
    fillet1_piece_19a = split(fillet1_piece_19a, bisect_by=Plane(origin=(120.226395114, 127.826395114, 3), z_dir=(0, 0, 1)), keep=Keep.TOP, mode=Mode.PRIVATE)
    with BuildSketch(Plane(origin=(120, 130.1, 3), x_dir=(0, 0, 1), z_dir=(0, -1, 0))) as fillet1_piece_19b_section:
        with BuildLine():
            CenterArc((FILLET1_R, -FILLET1_R), FILLET1_R, 90, 90)
            Line((0, -FILLET1_R), (-FILLET1_R * 0.02, -FILLET1_R))
            Line((-FILLET1_R * 0.02, -FILLET1_R), (-FILLET1_R * 0.02, FILLET1_R * 0.02))
            Line((-FILLET1_R * 0.02, FILLET1_R * 0.02), (FILLET1_R, FILLET1_R * 0.02))
            Line((FILLET1_R, FILLET1_R * 0.02), (FILLET1_R, 0))
        make_face()
    fillet1_piece_19b = extrude(amount=17.5, mode=Mode.PRIVATE)
    fillet1_piece_19b = split(fillet1_piece_19b, bisect_by=Plane(origin=(120.226395114, 127.6, 3.226395114), z_dir=(0, 1, 0)), keep=Keep.TOP, mode=Mode.PRIVATE)
    fillet1_piece_19 = fillet1_piece_19a & fillet1_piece_19b
    add(fillet1_piece_19, mode=Mode.SUBTRACT)
    with BuildSketch(Plane(origin=(120, 127.6, 3), x_dir=(0, 0, 1), z_dir=(0, -1, 0))) as fillet1_piece_20a_section:
        with BuildLine():
            CenterArc((FILLET1_R, -FILLET1_R), FILLET1_R, 90, 90)
            Line((0, -FILLET1_R), (-FILLET1_R * 0.0200000000001, -FILLET1_R))
            Line((-FILLET1_R * 0.0200000000001, -FILLET1_R), (-FILLET1_R * 0.02, FILLET1_R * 0.02))
            Line((-FILLET1_R * 0.02, FILLET1_R * 0.02), (FILLET1_R, FILLET1_R * 0.02))
            Line((FILLET1_R, FILLET1_R * 0.02), (FILLET1_R, 0))
        make_face()
    fillet1_piece_20a = extrude(amount=17.5, mode=Mode.PRIVATE)
    fillet1_piece_20a = split(fillet1_piece_20a, bisect_by=Plane(origin=(120.226395114, 112.6, 3.226395114), z_dir=(0, -1, 0)), keep=Keep.TOP, mode=Mode.PRIVATE)
    with BuildSketch(Plane(origin=(120, 112.6, 0), x_dir=(0, -1, 0), z_dir=(0, 0, 1))) as fillet1_piece_20b_section:
        with BuildLine():
            CenterArc((FILLET1_R, FILLET1_R), FILLET1_R, 180, 90)
            Line((0, FILLET1_R), (-FILLET1_R * 0.0200000000001, FILLET1_R))
            Line((-FILLET1_R * 0.0200000000001, FILLET1_R), (-FILLET1_R * 0.02, -FILLET1_R * 0.02))
            Line((-FILLET1_R * 0.02, -FILLET1_R * 0.02), (FILLET1_R, -FILLET1_R * 0.02))
            Line((FILLET1_R, -FILLET1_R * 0.02), (FILLET1_R, 0))
        make_face()
    fillet1_piece_20b = extrude(amount=5.5, mode=Mode.PRIVATE)
    fillet1_piece_20b = split(fillet1_piece_20b, bisect_by=Plane(origin=(120.226395114, 112.373604886, 3), z_dir=(0, 0, 1)), keep=Keep.TOP, mode=Mode.PRIVATE)
    fillet1_piece_20 = fillet1_piece_20a & fillet1_piece_20b
    add(fillet1_piece_20, mode=Mode.SUBTRACT)
    with BuildSketch(Plane(origin=(120, 177.6, 0), x_dir=(0, 1, 0), z_dir=(0, 0, 1))) as fillet1_piece_21a_section:
        with BuildLine():
            CenterArc((FILLET1_R, -FILLET1_R), FILLET1_R, 90, 90)
            Line((0, -FILLET1_R), (-FILLET1_R * 0.0200000000002, -FILLET1_R))
            Line((-FILLET1_R * 0.0200000000002, -FILLET1_R), (-FILLET1_R * 0.02, FILLET1_R * 0.02))
            Line((-FILLET1_R * 0.02, FILLET1_R * 0.02), (FILLET1_R, FILLET1_R * 0.02))
            Line((FILLET1_R, FILLET1_R * 0.02), (FILLET1_R, 0))
        make_face()
    fillet1_piece_21a = extrude(amount=5.5, mode=Mode.PRIVATE)
    fillet1_piece_21a = split(fillet1_piece_21a, bisect_by=Plane(origin=(120.226395114, 177.826395114, 3), z_dir=(0, 0, 1)), keep=Keep.TOP, mode=Mode.PRIVATE)
    with BuildSketch(Plane(origin=(120, 180.1, 3), x_dir=(0, 0, 1), z_dir=(0, -1, 0))) as fillet1_piece_21b_section:
        with BuildLine():
            CenterArc((FILLET1_R, -FILLET1_R), FILLET1_R, 90, 90)
            Line((0, -FILLET1_R), (-FILLET1_R * 0.02, -FILLET1_R))
            Line((-FILLET1_R * 0.02, -FILLET1_R), (-FILLET1_R * 0.02, FILLET1_R * 0.02))
            Line((-FILLET1_R * 0.02, FILLET1_R * 0.02), (FILLET1_R, FILLET1_R * 0.02))
            Line((FILLET1_R, FILLET1_R * 0.02), (FILLET1_R, 0))
        make_face()
    fillet1_piece_21b = extrude(amount=17.5, mode=Mode.PRIVATE)
    fillet1_piece_21b = split(fillet1_piece_21b, bisect_by=Plane(origin=(120.226395114, 177.6, 3.226395114), z_dir=(0, 1, 0)), keep=Keep.TOP, mode=Mode.PRIVATE)
    fillet1_piece_21 = fillet1_piece_21a & fillet1_piece_21b
    add(fillet1_piece_21, mode=Mode.SUBTRACT)
    with BuildSketch(Plane(origin=(120, 177.6, 3), x_dir=(0, 0, 1), z_dir=(0, -1, 0))) as fillet1_piece_22a_section:
        with BuildLine():
            CenterArc((FILLET1_R, -FILLET1_R), FILLET1_R, 90, 90)
            Line((0, -FILLET1_R), (-FILLET1_R * 0.0200000000002, -FILLET1_R))
            Line((-FILLET1_R * 0.0200000000002, -FILLET1_R), (-FILLET1_R * 0.02, FILLET1_R * 0.02))
            Line((-FILLET1_R * 0.02, FILLET1_R * 0.02), (FILLET1_R, FILLET1_R * 0.02))
            Line((FILLET1_R, FILLET1_R * 0.02), (FILLET1_R, 0))
        make_face()
    fillet1_piece_22a = extrude(amount=17.5, mode=Mode.PRIVATE)
    fillet1_piece_22a = split(fillet1_piece_22a, bisect_by=Plane(origin=(120.226395114, 162.6, 3.226395114), z_dir=(0, -1, 0)), keep=Keep.TOP, mode=Mode.PRIVATE)
    with BuildSketch(Plane(origin=(120, 162.6, 0), x_dir=(0, -1, 0), z_dir=(0, 0, 1))) as fillet1_piece_22b_section:
        with BuildLine():
            CenterArc((FILLET1_R, FILLET1_R), FILLET1_R, 180, 90)
            Line((0, FILLET1_R), (-FILLET1_R * 0.0200000000002, FILLET1_R))
            Line((-FILLET1_R * 0.0200000000002, FILLET1_R), (-FILLET1_R * 0.02, -FILLET1_R * 0.02))
            Line((-FILLET1_R * 0.02, -FILLET1_R * 0.02), (FILLET1_R, -FILLET1_R * 0.02))
            Line((FILLET1_R, -FILLET1_R * 0.02), (FILLET1_R, 0))
        make_face()
    fillet1_piece_22b = extrude(amount=5.5, mode=Mode.PRIVATE)
    fillet1_piece_22b = split(fillet1_piece_22b, bisect_by=Plane(origin=(120.226395114, 162.373604886, 3), z_dir=(0, 0, 1)), keep=Keep.TOP, mode=Mode.PRIVATE)
    fillet1_piece_22 = fillet1_piece_22a & fillet1_piece_22b
    add(fillet1_piece_22, mode=Mode.SUBTRACT)


solid = part.part
